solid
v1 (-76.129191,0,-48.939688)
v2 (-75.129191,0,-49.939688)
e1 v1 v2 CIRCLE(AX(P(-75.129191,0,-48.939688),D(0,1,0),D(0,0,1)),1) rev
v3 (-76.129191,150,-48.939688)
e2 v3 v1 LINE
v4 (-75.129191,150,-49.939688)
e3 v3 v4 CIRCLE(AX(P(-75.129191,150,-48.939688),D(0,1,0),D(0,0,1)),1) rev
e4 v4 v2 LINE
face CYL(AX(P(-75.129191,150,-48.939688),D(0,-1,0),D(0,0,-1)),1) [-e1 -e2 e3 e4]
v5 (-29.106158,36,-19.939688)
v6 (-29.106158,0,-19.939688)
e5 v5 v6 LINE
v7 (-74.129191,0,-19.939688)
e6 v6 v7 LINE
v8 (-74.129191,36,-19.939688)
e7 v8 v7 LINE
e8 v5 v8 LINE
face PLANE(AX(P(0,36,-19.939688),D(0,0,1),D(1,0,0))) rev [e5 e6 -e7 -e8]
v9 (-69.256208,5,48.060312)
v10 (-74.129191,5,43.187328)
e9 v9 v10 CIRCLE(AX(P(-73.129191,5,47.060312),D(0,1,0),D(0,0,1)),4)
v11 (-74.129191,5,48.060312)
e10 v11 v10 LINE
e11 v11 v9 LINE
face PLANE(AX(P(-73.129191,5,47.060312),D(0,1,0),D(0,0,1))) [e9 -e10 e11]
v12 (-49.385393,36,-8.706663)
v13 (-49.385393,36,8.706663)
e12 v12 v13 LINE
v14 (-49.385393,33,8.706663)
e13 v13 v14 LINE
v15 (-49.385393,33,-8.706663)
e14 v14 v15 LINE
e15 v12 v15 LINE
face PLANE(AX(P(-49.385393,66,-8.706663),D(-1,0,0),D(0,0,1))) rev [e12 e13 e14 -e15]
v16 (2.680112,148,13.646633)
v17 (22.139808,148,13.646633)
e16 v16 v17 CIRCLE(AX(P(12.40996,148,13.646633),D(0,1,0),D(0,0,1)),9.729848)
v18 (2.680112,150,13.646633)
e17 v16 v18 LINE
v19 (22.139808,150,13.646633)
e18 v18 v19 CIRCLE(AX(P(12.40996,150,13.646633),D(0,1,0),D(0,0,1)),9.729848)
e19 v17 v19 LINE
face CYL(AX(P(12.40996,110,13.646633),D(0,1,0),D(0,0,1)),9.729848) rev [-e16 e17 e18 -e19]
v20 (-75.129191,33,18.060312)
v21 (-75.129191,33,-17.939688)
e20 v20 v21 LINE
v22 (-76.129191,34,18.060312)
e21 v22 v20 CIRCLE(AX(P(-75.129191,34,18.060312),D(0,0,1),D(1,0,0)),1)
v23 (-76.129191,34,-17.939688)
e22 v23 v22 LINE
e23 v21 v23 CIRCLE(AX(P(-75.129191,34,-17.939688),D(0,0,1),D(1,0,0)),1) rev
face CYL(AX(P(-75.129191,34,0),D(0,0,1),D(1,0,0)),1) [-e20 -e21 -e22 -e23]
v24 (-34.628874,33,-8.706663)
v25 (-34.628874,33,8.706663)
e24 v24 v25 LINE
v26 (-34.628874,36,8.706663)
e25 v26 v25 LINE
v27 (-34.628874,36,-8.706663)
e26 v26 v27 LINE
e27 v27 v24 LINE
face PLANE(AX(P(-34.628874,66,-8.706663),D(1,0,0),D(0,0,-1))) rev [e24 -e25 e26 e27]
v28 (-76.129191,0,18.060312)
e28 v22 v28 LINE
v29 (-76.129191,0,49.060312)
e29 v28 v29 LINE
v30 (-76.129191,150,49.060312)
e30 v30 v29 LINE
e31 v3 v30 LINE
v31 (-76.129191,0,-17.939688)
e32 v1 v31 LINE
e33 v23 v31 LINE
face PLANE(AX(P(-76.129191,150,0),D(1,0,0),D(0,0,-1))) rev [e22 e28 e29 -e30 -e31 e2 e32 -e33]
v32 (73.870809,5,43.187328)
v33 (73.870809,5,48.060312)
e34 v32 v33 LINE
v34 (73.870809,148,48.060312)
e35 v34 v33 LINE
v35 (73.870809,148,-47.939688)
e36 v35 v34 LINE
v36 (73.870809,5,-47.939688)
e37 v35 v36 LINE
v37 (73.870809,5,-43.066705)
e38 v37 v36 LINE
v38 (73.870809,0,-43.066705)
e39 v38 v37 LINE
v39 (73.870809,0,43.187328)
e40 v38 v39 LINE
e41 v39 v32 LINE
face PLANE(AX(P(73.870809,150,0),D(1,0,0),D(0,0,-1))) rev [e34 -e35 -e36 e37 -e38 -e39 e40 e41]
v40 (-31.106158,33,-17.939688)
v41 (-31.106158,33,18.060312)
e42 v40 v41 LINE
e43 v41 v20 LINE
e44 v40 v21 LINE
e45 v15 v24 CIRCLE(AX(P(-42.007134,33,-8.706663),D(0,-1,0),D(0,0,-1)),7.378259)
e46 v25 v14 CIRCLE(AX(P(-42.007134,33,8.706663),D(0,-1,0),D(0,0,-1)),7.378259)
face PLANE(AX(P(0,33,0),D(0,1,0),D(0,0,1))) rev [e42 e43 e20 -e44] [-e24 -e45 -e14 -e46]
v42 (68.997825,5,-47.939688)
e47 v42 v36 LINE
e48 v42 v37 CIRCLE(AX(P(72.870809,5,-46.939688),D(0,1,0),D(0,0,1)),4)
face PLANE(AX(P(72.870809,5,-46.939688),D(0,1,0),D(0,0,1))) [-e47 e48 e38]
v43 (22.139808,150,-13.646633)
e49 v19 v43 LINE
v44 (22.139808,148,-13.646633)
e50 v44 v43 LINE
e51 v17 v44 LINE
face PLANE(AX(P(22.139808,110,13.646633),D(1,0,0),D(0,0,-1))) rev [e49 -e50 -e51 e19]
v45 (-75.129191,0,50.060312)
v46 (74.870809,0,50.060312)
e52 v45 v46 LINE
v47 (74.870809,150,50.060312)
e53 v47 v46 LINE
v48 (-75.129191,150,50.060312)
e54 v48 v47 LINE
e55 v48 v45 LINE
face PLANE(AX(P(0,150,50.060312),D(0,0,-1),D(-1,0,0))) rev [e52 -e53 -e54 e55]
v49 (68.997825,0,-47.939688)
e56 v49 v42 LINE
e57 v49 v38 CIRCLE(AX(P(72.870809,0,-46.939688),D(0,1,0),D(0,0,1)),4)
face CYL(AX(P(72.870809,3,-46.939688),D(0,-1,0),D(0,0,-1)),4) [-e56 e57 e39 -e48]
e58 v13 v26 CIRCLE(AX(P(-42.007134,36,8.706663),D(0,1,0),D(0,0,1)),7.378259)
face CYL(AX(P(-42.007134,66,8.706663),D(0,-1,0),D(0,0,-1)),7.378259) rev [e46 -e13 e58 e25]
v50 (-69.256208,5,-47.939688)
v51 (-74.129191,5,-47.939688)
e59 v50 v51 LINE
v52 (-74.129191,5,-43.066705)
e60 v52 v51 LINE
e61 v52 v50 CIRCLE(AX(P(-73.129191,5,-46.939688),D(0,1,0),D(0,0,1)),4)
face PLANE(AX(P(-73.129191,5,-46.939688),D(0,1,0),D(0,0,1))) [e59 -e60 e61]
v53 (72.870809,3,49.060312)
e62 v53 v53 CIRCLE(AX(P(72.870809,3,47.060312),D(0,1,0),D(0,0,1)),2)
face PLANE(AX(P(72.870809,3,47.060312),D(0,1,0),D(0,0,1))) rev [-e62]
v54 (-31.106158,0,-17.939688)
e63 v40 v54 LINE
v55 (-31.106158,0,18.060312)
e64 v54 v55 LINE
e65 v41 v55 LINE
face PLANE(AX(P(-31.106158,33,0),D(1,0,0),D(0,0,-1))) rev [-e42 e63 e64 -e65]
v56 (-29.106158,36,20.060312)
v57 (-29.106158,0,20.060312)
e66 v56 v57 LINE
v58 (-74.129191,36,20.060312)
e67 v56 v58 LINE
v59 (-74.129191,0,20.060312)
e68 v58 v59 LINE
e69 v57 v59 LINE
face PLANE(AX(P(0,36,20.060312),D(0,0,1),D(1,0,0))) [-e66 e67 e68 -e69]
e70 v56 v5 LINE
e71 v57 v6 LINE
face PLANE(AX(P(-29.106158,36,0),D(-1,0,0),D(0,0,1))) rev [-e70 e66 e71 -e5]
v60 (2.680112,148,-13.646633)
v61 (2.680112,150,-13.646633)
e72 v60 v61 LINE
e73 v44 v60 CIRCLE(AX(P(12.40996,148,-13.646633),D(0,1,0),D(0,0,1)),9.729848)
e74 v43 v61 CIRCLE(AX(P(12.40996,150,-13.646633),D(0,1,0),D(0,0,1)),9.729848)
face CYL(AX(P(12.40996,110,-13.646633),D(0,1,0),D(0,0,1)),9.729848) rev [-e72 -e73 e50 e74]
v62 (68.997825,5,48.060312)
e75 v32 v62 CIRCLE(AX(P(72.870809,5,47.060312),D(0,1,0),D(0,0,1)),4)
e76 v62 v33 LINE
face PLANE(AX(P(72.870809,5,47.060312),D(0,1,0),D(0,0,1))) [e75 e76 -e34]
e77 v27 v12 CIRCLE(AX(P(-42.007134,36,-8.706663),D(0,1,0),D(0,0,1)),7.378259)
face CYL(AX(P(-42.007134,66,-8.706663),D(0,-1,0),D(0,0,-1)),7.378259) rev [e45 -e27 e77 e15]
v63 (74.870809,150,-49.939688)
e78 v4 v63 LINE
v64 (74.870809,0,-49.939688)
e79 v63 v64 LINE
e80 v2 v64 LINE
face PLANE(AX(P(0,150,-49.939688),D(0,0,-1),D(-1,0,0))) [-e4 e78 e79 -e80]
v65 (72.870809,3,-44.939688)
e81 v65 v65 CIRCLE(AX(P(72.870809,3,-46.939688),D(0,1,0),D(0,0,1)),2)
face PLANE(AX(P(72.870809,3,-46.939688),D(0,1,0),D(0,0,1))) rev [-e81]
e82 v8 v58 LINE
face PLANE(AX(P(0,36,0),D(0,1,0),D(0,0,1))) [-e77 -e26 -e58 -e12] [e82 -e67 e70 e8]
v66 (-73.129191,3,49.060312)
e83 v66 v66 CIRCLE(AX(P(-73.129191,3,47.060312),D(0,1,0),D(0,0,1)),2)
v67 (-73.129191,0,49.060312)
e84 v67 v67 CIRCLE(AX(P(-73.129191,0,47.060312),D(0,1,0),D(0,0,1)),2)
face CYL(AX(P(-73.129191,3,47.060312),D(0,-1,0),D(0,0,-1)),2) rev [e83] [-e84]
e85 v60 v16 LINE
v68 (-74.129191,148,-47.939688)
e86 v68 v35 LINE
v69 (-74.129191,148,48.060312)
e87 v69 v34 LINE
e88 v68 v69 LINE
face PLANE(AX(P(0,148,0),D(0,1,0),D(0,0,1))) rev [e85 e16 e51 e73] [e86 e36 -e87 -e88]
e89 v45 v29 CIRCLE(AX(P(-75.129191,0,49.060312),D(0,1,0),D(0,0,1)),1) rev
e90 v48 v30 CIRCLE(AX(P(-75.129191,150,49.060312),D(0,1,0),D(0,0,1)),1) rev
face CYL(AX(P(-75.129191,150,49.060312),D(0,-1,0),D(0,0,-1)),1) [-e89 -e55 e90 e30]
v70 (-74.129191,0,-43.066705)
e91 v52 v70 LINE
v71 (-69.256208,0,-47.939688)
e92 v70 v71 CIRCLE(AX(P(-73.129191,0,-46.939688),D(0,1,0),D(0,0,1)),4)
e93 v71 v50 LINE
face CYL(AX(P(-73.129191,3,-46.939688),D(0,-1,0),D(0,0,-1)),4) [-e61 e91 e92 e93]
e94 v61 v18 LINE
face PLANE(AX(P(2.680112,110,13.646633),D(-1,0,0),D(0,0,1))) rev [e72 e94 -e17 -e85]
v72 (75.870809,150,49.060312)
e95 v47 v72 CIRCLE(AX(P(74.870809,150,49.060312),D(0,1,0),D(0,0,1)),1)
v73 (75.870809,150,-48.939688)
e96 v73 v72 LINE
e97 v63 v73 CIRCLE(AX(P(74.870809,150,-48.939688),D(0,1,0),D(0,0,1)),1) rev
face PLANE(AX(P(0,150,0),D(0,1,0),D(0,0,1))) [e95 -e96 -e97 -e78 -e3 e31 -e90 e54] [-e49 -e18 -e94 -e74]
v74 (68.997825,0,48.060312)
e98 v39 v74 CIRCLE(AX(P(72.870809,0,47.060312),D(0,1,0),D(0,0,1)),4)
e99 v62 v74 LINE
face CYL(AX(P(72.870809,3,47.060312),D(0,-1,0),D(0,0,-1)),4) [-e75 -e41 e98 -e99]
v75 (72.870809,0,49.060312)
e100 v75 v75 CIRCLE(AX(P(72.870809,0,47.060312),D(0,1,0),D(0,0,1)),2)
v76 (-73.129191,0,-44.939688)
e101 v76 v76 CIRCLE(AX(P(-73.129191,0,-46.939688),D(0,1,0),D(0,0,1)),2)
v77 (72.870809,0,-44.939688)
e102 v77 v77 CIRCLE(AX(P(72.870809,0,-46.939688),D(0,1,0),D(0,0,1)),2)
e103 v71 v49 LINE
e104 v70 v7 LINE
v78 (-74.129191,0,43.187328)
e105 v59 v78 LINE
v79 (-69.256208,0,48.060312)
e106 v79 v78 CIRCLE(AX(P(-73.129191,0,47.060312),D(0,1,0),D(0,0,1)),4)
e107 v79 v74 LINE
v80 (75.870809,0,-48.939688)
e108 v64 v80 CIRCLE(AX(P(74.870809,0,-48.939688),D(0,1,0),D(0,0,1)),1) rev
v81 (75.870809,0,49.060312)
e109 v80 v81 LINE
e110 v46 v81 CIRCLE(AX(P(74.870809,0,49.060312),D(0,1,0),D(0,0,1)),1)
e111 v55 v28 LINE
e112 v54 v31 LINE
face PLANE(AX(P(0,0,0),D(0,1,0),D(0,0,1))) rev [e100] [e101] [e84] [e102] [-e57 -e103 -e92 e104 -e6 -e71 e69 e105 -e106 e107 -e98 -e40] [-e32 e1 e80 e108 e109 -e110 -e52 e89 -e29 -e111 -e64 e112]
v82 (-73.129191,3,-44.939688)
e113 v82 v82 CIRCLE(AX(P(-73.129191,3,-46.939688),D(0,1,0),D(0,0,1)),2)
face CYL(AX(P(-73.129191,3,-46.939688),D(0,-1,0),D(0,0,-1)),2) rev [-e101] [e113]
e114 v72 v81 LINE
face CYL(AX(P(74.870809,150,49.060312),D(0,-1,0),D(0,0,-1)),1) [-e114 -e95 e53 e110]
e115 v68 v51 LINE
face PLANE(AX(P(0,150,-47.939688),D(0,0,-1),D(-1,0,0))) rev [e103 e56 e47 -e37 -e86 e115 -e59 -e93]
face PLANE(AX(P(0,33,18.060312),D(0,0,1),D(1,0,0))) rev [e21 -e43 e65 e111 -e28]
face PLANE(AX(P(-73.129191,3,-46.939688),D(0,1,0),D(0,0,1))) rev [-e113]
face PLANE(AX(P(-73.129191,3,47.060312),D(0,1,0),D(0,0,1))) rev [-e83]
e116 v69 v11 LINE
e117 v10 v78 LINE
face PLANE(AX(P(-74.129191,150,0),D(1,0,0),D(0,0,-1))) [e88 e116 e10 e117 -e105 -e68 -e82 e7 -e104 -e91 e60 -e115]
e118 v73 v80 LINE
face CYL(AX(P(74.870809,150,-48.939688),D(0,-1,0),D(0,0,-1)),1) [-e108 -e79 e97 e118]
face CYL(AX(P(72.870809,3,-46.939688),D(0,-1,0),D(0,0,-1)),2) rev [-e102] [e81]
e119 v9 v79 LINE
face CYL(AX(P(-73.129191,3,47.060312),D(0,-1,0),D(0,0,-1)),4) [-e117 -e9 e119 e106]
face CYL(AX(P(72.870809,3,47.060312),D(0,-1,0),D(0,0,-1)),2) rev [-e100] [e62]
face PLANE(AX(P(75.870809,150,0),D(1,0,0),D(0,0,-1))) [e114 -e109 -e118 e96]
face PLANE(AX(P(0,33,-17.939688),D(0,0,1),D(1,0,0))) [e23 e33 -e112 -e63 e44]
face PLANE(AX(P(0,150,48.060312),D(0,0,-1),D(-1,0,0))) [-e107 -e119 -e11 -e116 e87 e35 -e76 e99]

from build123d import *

# Parameters (mm, degrees)
BOSS_EXTRUDE7_DEPTH  = 150
SKETCH2_42_R         = 2
CUT_EXTRUDE8_DEPTH   = 3
SHELL4_DEPTH         = 148
SHELL4_START         = 5
SHELL4_2_DEPTH       = 143
SKETCH2_43_W         = 45.023033392
SKETCH2_43_H         = 36
BOSS_EXTRUDE8_DEPTH  = 36
SKETCH2_44_W         = 45.023033392
SKETCH2_44_H         = 36
CUT_EXTRUDE9_DEPTH   = 33
CUT_EXTRUDE11_DEPTH  = 33
FILLET4_R            = 1
BOSS_EXTRUDE11_DEPTH = 40
CUT_EXTRUDE16_DEPTH  = 40


# Read off the part's stored shape, not the designer's step: Shell4
with BuildPart() as part:
    # Sketch2 → Boss-Extrude7 (new body)
    with BuildSketch(Plane(origin=(0, 0, 0), x_dir=(1, 0, 0), z_dir=(0, 1, 0))):
        with BuildLine():
            Line((-76.129191463, 48.939688446), (-76.129191463, -49.060311554))
            ThreePointArc((-76.129191463, -49.060311554), (-75.836298244, -49.767418335), (-75.129191463, -50.060311554))
            Line((-75.129191463, -50.060311554), (74.870808537, -50.060311554))
            ThreePointArc((74.870808537, -50.060311554), (75.577915319, -49.767418335), (75.870808537, -49.060311554))
            Line((75.870808537, -49.060311554), (75.870808537, 48.939688446))
            ThreePointArc((75.870808537, 48.939688446), (75.577915319, 49.646795227), (74.870808537, 49.939688446))
            Line((74.870808537, 49.939688446), (-75.129191463, 49.939688446))
            ThreePointArc((-75.129191463, 49.939688446), (-75.836298244, 49.646795227), (-76.129191463, 48.939688446))
        make_face()
    extrude(amount=BOSS_EXTRUDE7_DEPTH)

    # Sketch2<42> → Cut-Extrude8 (cut)
    with BuildSketch(Plane(origin=(0, 0, 0), x_dir=(1, 0, 0), z_dir=(0, 1, 0))):
        with Locations(Location((-73.129191463, 46.939688446, 0), (0, 0, 270))):
            Circle(SKETCH2_42_R)
        with Locations(Location((72.870808537, 46.939688446, 0), (0, 0, 270))):
            Circle(SKETCH2_42_R)
        with Locations(Location((72.870808537, -47.060311554, 0), (0, 0, 270))):
            Circle(SKETCH2_42_R)
        with Locations(Location((-73.129191463, -47.060311554, 0), (0, 0, 270))):
            Circle(SKETCH2_42_R)
    extrude(amount=CUT_EXTRUDE8_DEPTH, mode=Mode.SUBTRACT)

    # Shell4 outline → Shell4 (cut)
    with BuildSketch(Plane(origin=(0, 0, 0), x_dir=(1, 0, 0), z_dir=(0, 1, 0))):
        with BuildLine():
            Line((-74.129191463, 43.0667051), (-74.129191463, -43.187328208))
            ThreePointArc((-74.129191463, -43.187328208), (-70.300764338, -44.231884429), (-69.256208116, -48.060311554))
            Line((-69.256208116, -48.060311554), (68.997825191, -48.060311554))
            ThreePointArc((68.997825191, -48.060311554), (70.042381413, -44.231884429), (73.870808537, -43.187328208))
            Line((73.870808537, -43.187328208), (73.870808537, 43.0667051))
            ThreePointArc((73.870808537, 43.0667051), (70.042381413, 44.111261321), (68.997825191, 47.939688446))
            Line((68.997825191, 47.939688446), (-69.256208116, 47.939688446))
            ThreePointArc((-69.256208116, 47.939688446), (-70.300764338, 44.111261321), (-74.129191463, 43.0667051))
        make_face()
    extrude(amount=SHELL4_DEPTH, mode=Mode.SUBTRACT)

    # Shell4 2 outline → Shell4 2 (cut)
    with BuildSketch(Plane(origin=(0, 0, 0), x_dir=(1, 0, 0), z_dir=(0, 1, 0)).offset(SHELL4_START)):
        with BuildLine():
            Line((-74.129191463, -43.187328208), (-74.129191463, -48.060311554))
            Line((-74.129191463, -48.060311554), (-69.256208116, -48.060311554))
            ThreePointArc((-69.256208116, -48.060311554), (-70.300764338, -44.231884429), (-74.129191463, -43.187328208))
        make_face()
        with BuildLine():
            Line((-74.129191463, 47.939688446), (-74.129191463, 43.0667051))
            ThreePointArc((-74.129191463, 43.0667051), (-70.300764338, 44.111261321), (-69.256208116, 47.939688446))
            Line((-69.256208116, 47.939688446), (-74.129191463, 47.939688446))
        make_face()
        with BuildLine():
            ThreePointArc((73.870808537, -43.187328208), (70.042381413, -44.231884429), (68.997825191, -48.060311554))
            Line((68.997825191, -48.060311554), (73.870808537, -48.060311554))
            Line((73.870808537, -48.060311554), (73.870808537, -43.187328208))
        make_face()
        with BuildLine():
            Line((73.870808537, 47.939688446), (68.997825191, 47.939688446))
            ThreePointArc((68.997825191, 47.939688446), (70.042381413, 44.111261321), (73.870808537, 43.0667051))
            Line((73.870808537, 43.0667051), (73.870808537, 47.939688446))
        make_face()
    extrude(amount=SHELL4_2_DEPTH, mode=Mode.SUBTRACT)

    # Sketch2<43> → Boss-Extrude8 (add)
    with BuildSketch(Plane(origin=(0, 0, 0), x_dir=(1, 0, 0), z_dir=(0, 1, 0))):
        Polygon((-76.129191463, -20.060311554), (-29.106158071, -20.060311554), (-29.106158071, 19.939688446), (-76.129191463, 19.939688446), (-76.129191463, 17.939688446), (-31.106158071, 17.939688446), (-31.106158071, -18.060311554), (-76.129191463, -18.060311554), align=None)
        with Locations((-53.617674767, -0.060311554)):
            Rectangle(SKETCH2_43_W, SKETCH2_43_H)
    extrude(amount=BOSS_EXTRUDE8_DEPTH)

    # Sketch2<44> → Cut-Extrude9 (cut)
    with BuildSketch(Plane(origin=(0, 0, 0), x_dir=(1, 0, 0), z_dir=(0, 1, 0))):
        with Locations((-53.617674767, -0.060311554)):
            Rectangle(SKETCH2_44_W, SKETCH2_44_H)
    extrude(amount=CUT_EXTRUDE9_DEPTH, mode=Mode.SUBTRACT)

    # Sketch7 → Cut-Extrude11 (cut)
    with BuildSketch(Plane.XZ.offset(-33)):
        with BuildLine():
            Line((-49.385393046, -8.706663468), (-49.385393046, 8.706663468))
            ThreePointArc((-49.385393046, 8.706663468), (-42.00713359, 16.084922924), (-34.628874134, 8.706663468))
            Line((-34.628874134, 8.706663468), (-34.628874134, -8.706663468))
            ThreePointArc((-34.628874134, -8.706663468), (-42.00713359, -16.084922924), (-49.385393046, -8.706663468))
        make_face()
    extrude(amount=-CUT_EXTRUDE11_DEPTH, mode=Mode.SUBTRACT)

    # Fillet4
    fillet4_edges = [part.edges().sort_by_distance(p)[0] for p in [
        (-76.129191463, 33, 0.060311554),
    ]]
    fillet(fillet4_edges, radius=FILLET4_R)

    # Sketch8 → Boss-Extrude11 (add)
    with BuildSketch(Plane(origin=(0, 150, 0), x_dir=(1, 0, 0), z_dir=(0, 1, 0))):
        with BuildLine():
            Line((2.680111603, -13.646632902), (2.680111603, 13.646632902))
            ThreePointArc((2.680111603, 13.646632902), (12.409959802, 23.376481102), (22.139808002, 13.646632902))
            Line((22.139808002, 13.646632902), (22.139808002, -13.646632902))
            ThreePointArc((22.139808002, -13.646632902), (12.409959802, -23.376481102), (2.680111603, -13.646632902))
        make_face()
    extrude(amount=-BOSS_EXTRUDE11_DEPTH)

    # Sketch8<7> → Cut-Extrude16 (cut)
    with BuildSketch(Plane(origin=(0, 150, 0), x_dir=(1, 0, 0), z_dir=(0, 1, 0))):
        with BuildLine():
            Line((2.680111603, -13.646632902), (2.680111603, 13.646632902))
            ThreePointArc((2.680111603, 13.646632902), (12.409959802, 23.376481102), (22.139808002, 13.646632902))
            Line((22.139808002, 13.646632902), (22.139808002, -13.646632902))
            ThreePointArc((22.139808002, -13.646632902), (12.409959802, -23.376481102), (2.680111603, -13.646632902))
        make_face()
    extrude(amount=-CUT_EXTRUDE16_DEPTH, mode=Mode.SUBTRACT)


solid = part.part
